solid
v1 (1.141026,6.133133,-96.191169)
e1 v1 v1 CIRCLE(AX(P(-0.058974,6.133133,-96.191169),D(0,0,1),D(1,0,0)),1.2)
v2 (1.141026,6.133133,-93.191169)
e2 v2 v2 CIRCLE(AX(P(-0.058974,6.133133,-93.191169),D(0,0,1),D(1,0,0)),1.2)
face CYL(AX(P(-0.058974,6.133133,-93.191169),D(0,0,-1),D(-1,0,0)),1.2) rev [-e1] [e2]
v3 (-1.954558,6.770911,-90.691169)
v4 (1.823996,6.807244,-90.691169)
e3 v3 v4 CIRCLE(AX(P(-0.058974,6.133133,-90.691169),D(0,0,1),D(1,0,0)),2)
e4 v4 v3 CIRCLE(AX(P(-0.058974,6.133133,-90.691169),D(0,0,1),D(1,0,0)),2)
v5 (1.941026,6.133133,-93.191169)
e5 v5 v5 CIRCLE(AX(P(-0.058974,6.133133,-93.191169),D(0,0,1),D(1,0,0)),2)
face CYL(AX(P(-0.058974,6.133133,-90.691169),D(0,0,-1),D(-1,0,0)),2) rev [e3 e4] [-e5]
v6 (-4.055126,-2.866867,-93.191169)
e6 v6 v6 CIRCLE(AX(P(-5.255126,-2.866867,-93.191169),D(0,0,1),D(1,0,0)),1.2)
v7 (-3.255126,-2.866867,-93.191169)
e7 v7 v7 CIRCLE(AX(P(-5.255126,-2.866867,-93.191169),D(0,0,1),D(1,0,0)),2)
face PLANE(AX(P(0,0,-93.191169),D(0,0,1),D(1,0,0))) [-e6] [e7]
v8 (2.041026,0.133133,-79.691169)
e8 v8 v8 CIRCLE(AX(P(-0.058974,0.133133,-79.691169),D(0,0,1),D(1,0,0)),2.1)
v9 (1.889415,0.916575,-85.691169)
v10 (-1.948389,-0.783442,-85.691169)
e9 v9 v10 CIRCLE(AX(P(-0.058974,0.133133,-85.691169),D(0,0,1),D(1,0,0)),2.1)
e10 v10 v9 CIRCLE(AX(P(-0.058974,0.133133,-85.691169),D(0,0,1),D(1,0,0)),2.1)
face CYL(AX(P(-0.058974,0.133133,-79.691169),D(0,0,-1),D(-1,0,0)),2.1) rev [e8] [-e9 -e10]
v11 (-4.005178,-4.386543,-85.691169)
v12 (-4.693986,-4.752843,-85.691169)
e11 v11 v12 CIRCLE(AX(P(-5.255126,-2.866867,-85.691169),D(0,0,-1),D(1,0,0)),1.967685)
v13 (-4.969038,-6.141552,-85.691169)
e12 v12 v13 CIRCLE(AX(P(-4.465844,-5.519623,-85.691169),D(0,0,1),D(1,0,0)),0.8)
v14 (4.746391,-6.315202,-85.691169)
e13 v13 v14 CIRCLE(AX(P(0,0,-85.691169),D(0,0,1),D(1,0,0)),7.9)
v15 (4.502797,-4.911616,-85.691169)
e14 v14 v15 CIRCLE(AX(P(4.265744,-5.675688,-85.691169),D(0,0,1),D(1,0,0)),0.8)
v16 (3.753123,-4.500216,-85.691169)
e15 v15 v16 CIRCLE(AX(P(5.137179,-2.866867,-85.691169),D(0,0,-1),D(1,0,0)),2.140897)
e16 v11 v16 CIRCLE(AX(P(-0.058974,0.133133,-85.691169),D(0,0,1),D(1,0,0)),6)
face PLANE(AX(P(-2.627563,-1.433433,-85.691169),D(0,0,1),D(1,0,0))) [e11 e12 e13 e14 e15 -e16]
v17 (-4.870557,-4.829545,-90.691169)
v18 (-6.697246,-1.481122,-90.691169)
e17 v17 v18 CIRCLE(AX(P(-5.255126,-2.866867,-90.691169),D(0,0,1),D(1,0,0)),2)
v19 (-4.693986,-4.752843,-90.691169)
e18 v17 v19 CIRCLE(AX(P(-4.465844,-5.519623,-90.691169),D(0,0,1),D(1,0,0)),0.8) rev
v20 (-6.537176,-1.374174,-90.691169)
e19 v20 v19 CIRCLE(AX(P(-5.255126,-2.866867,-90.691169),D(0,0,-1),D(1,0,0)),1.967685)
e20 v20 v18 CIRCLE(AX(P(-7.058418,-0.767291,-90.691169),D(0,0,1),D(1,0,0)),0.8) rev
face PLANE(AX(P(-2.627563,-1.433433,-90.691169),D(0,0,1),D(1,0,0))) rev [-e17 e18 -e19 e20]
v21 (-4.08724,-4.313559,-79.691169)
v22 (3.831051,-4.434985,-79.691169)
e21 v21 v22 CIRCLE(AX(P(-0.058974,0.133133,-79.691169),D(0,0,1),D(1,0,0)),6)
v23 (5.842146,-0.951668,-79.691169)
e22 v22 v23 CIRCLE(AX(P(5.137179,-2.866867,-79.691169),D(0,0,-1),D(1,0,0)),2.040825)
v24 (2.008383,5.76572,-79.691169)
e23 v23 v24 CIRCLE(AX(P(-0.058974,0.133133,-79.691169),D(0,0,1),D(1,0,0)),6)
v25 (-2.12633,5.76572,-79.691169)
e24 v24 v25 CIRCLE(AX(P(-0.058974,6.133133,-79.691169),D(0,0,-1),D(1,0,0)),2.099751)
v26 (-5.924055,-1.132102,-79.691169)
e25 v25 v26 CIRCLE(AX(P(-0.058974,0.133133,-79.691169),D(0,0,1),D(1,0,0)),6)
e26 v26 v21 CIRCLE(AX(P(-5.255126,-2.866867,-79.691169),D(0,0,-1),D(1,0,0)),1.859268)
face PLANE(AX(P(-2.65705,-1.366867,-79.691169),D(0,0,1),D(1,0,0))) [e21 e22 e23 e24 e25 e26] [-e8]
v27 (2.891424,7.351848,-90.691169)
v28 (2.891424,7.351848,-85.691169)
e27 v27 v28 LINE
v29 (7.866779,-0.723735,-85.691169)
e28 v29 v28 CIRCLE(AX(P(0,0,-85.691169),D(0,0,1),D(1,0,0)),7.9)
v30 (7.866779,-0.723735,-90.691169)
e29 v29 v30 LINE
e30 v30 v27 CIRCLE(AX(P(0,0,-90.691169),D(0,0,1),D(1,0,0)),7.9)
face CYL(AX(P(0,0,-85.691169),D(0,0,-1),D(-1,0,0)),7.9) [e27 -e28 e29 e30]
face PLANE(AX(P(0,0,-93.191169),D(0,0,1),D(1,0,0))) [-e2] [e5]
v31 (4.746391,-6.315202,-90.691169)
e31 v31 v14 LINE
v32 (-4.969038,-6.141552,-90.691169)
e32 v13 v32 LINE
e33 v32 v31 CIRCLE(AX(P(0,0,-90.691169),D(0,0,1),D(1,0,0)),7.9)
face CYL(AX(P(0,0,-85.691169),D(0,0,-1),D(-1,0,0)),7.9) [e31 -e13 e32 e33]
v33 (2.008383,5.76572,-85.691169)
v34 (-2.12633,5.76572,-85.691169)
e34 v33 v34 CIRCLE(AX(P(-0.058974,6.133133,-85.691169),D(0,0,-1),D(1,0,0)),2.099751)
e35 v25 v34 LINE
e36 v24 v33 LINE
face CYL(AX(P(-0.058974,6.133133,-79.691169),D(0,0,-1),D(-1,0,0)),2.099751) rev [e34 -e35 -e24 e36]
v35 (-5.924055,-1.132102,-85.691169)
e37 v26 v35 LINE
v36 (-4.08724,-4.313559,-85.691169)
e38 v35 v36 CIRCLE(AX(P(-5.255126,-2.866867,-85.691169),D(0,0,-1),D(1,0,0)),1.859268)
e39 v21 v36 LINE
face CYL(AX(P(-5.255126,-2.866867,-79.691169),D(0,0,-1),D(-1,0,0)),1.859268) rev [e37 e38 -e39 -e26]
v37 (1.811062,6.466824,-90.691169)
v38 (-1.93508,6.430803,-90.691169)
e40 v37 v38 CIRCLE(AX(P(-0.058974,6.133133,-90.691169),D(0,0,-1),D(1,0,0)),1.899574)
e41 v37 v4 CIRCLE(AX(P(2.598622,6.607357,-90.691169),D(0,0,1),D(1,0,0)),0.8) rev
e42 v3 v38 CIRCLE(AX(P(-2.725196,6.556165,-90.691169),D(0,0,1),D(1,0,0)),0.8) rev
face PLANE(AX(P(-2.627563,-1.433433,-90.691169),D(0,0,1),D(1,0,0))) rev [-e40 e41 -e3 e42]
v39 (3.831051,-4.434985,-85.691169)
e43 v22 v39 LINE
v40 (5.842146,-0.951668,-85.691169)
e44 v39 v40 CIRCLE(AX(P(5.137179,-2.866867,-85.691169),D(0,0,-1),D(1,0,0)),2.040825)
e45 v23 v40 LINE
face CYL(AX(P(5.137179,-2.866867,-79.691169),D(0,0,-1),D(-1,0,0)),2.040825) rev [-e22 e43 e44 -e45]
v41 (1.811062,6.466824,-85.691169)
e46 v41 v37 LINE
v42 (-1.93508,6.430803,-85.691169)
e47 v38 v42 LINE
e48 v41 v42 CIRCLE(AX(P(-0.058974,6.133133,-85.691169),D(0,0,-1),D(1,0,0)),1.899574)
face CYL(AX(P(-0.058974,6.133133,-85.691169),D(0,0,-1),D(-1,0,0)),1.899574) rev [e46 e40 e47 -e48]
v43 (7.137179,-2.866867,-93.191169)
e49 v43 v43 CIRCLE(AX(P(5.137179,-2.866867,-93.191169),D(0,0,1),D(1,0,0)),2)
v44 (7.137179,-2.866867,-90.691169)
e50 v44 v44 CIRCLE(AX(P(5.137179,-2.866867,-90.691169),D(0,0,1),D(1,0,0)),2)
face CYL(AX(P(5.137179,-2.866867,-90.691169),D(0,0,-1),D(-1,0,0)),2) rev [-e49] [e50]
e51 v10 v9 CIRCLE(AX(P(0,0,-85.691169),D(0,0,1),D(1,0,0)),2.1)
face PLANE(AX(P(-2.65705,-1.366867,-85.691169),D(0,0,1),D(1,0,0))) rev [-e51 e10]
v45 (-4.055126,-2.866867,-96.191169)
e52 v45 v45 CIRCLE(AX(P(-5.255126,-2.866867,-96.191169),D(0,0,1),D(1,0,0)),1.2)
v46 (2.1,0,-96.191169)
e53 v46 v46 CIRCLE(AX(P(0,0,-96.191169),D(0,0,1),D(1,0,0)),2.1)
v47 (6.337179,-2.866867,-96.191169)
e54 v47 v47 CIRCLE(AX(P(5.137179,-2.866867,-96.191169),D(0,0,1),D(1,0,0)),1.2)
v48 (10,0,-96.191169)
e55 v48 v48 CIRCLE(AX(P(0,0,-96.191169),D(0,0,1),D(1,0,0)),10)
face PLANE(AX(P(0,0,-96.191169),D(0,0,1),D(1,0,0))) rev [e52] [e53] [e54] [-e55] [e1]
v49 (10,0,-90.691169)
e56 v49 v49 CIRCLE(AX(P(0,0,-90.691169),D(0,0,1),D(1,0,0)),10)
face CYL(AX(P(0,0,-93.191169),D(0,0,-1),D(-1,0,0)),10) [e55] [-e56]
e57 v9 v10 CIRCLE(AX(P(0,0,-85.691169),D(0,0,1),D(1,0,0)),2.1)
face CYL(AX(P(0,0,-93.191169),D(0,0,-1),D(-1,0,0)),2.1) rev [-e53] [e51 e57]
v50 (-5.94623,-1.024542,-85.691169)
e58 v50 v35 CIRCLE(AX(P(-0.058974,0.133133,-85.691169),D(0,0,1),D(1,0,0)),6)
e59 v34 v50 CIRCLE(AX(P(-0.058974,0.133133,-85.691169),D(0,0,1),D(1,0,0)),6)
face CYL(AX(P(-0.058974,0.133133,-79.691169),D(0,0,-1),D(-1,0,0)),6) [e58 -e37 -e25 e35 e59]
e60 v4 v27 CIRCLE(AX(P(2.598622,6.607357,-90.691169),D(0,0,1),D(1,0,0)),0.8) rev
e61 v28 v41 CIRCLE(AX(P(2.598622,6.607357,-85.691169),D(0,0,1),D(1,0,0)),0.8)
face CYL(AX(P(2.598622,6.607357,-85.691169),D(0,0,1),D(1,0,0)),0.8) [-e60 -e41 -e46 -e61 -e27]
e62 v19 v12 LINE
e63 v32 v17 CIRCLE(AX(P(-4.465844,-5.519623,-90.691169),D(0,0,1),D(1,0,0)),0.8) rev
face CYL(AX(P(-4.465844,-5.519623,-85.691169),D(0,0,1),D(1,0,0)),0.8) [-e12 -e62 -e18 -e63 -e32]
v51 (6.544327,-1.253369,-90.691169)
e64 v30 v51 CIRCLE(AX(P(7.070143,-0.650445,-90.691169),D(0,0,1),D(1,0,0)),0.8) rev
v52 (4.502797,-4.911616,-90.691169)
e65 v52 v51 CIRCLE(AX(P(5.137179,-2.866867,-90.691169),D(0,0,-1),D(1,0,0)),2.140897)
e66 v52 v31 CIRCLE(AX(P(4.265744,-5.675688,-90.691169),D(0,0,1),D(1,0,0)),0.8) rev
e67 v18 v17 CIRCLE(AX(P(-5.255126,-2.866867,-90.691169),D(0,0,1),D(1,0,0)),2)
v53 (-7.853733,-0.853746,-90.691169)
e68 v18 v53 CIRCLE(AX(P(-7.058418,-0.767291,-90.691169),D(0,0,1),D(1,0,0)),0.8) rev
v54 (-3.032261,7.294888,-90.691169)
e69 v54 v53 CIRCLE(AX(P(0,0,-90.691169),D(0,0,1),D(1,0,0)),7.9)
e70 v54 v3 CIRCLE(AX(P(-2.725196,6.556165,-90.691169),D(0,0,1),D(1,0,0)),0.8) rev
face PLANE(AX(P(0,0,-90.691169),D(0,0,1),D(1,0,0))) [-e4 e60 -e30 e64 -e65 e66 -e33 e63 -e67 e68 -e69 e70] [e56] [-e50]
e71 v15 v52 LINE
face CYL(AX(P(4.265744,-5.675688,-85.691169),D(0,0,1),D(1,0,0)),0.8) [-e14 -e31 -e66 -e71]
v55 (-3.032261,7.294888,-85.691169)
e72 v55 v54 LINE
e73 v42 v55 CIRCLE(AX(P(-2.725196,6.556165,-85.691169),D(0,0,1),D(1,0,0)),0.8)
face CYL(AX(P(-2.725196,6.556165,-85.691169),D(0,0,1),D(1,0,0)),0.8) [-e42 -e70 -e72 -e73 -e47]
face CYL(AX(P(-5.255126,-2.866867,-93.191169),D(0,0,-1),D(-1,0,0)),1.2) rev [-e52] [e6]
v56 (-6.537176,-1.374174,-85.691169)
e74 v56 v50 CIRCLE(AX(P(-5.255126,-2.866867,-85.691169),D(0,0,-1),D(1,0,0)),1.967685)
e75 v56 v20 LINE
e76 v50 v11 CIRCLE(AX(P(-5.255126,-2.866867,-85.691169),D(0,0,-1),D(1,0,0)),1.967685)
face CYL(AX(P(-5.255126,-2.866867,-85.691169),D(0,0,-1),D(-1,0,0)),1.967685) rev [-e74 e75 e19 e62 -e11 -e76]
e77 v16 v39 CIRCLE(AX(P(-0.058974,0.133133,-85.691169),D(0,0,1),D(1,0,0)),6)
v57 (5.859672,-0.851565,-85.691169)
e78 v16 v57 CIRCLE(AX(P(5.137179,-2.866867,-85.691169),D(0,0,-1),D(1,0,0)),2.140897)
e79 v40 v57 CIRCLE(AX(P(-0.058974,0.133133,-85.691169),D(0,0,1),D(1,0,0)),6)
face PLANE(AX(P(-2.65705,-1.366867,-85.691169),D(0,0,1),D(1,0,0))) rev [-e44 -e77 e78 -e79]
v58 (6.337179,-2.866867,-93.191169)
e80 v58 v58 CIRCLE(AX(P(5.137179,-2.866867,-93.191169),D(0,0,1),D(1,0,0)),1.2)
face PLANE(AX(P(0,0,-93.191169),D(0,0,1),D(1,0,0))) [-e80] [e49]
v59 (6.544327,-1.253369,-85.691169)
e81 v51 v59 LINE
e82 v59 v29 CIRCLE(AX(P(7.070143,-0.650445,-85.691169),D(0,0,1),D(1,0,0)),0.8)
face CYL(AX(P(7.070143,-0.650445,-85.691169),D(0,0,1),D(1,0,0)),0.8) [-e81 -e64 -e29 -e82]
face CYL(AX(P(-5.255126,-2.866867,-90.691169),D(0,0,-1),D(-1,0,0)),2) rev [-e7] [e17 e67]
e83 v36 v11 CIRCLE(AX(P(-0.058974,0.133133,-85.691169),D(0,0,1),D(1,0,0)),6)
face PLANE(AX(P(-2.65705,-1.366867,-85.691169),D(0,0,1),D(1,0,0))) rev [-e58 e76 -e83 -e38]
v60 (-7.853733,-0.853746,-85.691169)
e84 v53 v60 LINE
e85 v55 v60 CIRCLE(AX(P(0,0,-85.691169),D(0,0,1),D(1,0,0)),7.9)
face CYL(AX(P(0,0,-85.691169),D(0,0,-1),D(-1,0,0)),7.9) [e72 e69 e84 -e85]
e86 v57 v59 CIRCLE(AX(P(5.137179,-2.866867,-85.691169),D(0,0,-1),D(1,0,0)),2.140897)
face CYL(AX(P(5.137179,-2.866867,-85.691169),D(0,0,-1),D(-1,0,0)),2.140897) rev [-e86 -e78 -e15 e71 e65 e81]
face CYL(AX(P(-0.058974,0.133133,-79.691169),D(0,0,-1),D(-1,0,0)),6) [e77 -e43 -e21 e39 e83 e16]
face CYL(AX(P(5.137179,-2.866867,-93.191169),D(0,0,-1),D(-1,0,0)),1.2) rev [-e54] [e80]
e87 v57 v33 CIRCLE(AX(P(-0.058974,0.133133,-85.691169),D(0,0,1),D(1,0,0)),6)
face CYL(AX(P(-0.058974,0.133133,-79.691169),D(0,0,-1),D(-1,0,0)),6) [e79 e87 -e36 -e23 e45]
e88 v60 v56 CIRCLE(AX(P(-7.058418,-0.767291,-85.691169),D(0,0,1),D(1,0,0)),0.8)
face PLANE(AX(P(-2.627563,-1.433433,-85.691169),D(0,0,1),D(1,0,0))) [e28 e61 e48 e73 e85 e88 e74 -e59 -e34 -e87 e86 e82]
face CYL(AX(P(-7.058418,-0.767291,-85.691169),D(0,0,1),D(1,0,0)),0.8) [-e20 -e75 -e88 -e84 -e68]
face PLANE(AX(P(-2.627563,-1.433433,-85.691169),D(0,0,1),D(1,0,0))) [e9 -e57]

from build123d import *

# Parameters (mm, degrees)
SKETCH2_R           = 10
SKETCH2_R_2         = 2.1
SKETCH2_R_3         = 1.2
BOSS_EXTRUDE1_DEPTH = 3
SKETCH3_R           = 10
SKETCH3_R_2         = 2
SKETCH3_R_3         = 2.1
BOSS_EXTRUDE2_DEPTH = 2.5
SKETCH4_R           = 2.1
BOSS_EXTRUDE3_DEPTH = 5
FILLET1_R           = 0.8
SKETCH5_R           = 2.1
BOSS_EXTRUDE4_DEPTH = 6


with BuildPart() as part:
    # Sketch2 → Boss-Extrude1 (new body)
    with BuildSketch(Plane.XY.offset(-96.191169136)):
        Circle(SKETCH2_R)
        Circle(SKETCH2_R_2, mode=Mode.SUBTRACT)
        with Locations((-0.05897353, 6.133133301)):
            Circle(SKETCH2_R_3, mode=Mode.SUBTRACT)
        with Locations((5.137178892, -2.866866699)):
            Circle(SKETCH2_R_3, mode=Mode.SUBTRACT)
        with Locations((-5.255125953, -2.866866699)):
            Circle(SKETCH2_R_3, mode=Mode.SUBTRACT)
    extrude(amount=BOSS_EXTRUDE1_DEPTH)

    # Sketch3 → Boss-Extrude2 (add)
    with BuildSketch(Plane.XY.offset(-93.191169136)):
        Circle(SKETCH3_R)
        with Locations((-5.255125953, -2.866866699)):
            Circle(SKETCH3_R_2, mode=Mode.SUBTRACT)
        with Locations((-0.05897353, 6.133133301)):
            Circle(SKETCH3_R_2, mode=Mode.SUBTRACT)
        with Locations((5.137178892, -2.866866699)):
            Circle(SKETCH3_R_2, mode=Mode.SUBTRACT)
        Circle(SKETCH3_R_3, mode=Mode.SUBTRACT)
    extrude(amount=BOSS_EXTRUDE2_DEPTH)

    # Sketch4 → Boss-Extrude3 (add)
    with BuildSketch(Plane.XY.offset(-90.691169136)):
        with BuildLine():
            ThreePointArc((7.264990173, -3.103210883), (6.783257612, 4.049372318), (0.715851765, 7.8675))
            ThreePointArc((0.715851765, 7.8675), (-0.040708899, 4.233646925), (-0.867006302, 7.852279928))
            ThreePointArc((-0.867006302, 7.852279928), (-6.879264147, 3.884034604), (-7.171380747, -3.313804186))
            ThreePointArc((-7.171380747, -3.313804186), (-3.527763738, -1.924526353), (-6.668183396, -4.236192889))
            ThreePointArc((-6.668183396, -4.236192889), (-0.191069364, -7.897689061), (6.455528982, -4.553695814))
            ThreePointArc((6.455528982, -4.553695814), (3.267691347, -1.823575878), (7.264990173, -3.103210883))
        make_face()
        Circle(SKETCH4_R, mode=Mode.SUBTRACT)
    extrude(amount=BOSS_EXTRUDE3_DEPTH)

    # Fillet1
    # the kernel refuses this fillet: 0.8 mm, written as the material it takes off along each edge
    with BuildSketch(Plane(origin=(-0.867006302, 7.852279928, -90.691169136), x_dir=(-0.9684268820768696, -0.24929776186494912, 0), z_dir=(0, 0, 1))) as fillet1_piece_1:
        with BuildLine():
            CenterArc((2.122639751, 0.791949539), FILLET1_R, 156.548445833, 121.586747485)
            ThreePointArc((1.388722227, 1.110328352), (0.832290223, 0.382651946), (0, 0))
            ThreePointArc((0, 0), (1.117923602, -0.079498301), (2.235847204, 0))
        make_face()
    extrude(amount=10.589618011, mode=Mode.SUBTRACT)
    with BuildSketch(Plane(origin=(-7.171380747, -3.313804186, -90.691169136), x_dir=(-0.2672810953743128, 0.9636186050795758, 0), z_dir=(0, 0, 1))) as fillet1_piece_2:
        with BuildLine():
            CenterArc((2.423675061, -0.789487911), FILLET1_R, 80.701479552, 124.454730774)
            ThreePointArc((1.699553301, -1.129558017), (1.007651544, -0.327237606), (0, 0))
            ThreePointArc((0, 0), (1.276468866, 0.103806875), (2.552937731, 0))
        make_face()
    extrude(amount=11.382344328, mode=Mode.SUBTRACT)
    with BuildSketch(Plane(origin=(-6.668183396, -4.236192889, -90.691169136), x_dir=(0.9674204056157966, -0.2531753518772465, 0), z_dir=(0, 0, 1))) as fillet1_piece_3:
        with BuildLine():
            CenterArc((2.455521009, -0.684038404), FILLET1_R, 121.234961486, 124.454730774)
            ThreePointArc((2.126178356, -1.413101787), (1.005630009, -0.793004992), (0, 0))
            ThreePointArc((0, 0), (1.020340965, -0.285219915), (2.040681929, 0))
        make_face()
    extrude(amount=11.382344328, mode=Mode.SUBTRACT)
    with BuildSketch(Plane(origin=(6.455528982, -4.553695814, -90.691169136), x_dir=(-0.9836137954546407, -0.18028838396113095, 0), z_dir=(0, 0, 1))) as fillet1_piece_4:
        with BuildLine():
            CenterArc((2.356185075, 0.708813813), FILLET1_R, 116.541300521, 125.835667041)
            ThreePointArc((1.998710841, 1.42450381), (0.943696464, 0.790346579), (0, 0))
            ThreePointArc((0, 0), (0.99263164, 0.244025278), (1.98526328, 0))
        make_face()
    extrude(amount=11.13598817, mode=Mode.SUBTRACT)
    with BuildSketch(Plane(origin=(7.264990173, -3.103210883, -90.691169136), x_dir=(0.2451881288110309, 0.969475518767826, 0), z_dir=(0, 0, 1))) as fillet1_piece_5:
        with BuildLine():
            CenterArc((2.33012209, 0.790288667), FILLET1_R, 153.100934038, 125.835667041)
            ThreePointArc((1.616678166, 1.152224804), (0.94996865, 0.377392996), (0, 0))
            ThreePointArc((0, 0), (1.227197634, -0.095899413), (2.454395268, 0))
        make_face()
    extrude(amount=11.13598817, mode=Mode.SUBTRACT)
    with BuildSketch(Plane(origin=(0.715851765, 7.8675, -90.691169136), x_dir=(0.6159695110319643, -0.7877699927510841, 0), z_dir=(0, 0, 1))) as fillet1_piece_6:
        with BuildLine():
            CenterArc((2.152431859, 0.70697997), FILLET1_R, 120.508273334, 121.586747485)
            ThreePointArc((1.746301639, 1.396224661), (0.823506332, 0.760204236), (0, 0))
            ThreePointArc((0, 0), (0.889013284, 0.22087306), (1.778026567, 0))
        make_face()
    extrude(amount=10.589618011, mode=Mode.SUBTRACT)

    # Sketch5 → Boss-Extrude4 (add)
    with BuildSketch(Plane.XY.offset(-85.691169136)):
        with BuildLine():
            ThreePointArc((5.84214559, -0.951667659), (5.152070119, 3.107191821), (2.00838279, 5.765720437))
            ThreePointArc((2.00838279, 5.765720437), (-0.05897353, 4.033382276), (-2.126329851, 5.765720437))
            ThreePointArc((-2.126329851, 5.765720437), (-5.315006226, 3.026940535), (-5.924054987, -1.132101661))
            ThreePointArc((-5.924054987, -1.132101661), (-3.644953029, -1.937232928), (-4.087239877, -4.313558756))
            ThreePointArc((-4.087239877, -4.313558756), (-0.150972365, -5.866161342), (3.831051219, -4.434985289))
            ThreePointArc((3.831051219, -4.434985289), (3.369772867, -1.846454355), (5.84214559, -0.951667659))
        make_face()
        with Locations(Location((-0.05897353, 0.133133301, 0), (0, 0, 205.878507887))):
            Circle(SKETCH5_R, mode=Mode.SUBTRACT)
    extrude(amount=BOSS_EXTRUDE4_DEPTH)


solid = part.part
